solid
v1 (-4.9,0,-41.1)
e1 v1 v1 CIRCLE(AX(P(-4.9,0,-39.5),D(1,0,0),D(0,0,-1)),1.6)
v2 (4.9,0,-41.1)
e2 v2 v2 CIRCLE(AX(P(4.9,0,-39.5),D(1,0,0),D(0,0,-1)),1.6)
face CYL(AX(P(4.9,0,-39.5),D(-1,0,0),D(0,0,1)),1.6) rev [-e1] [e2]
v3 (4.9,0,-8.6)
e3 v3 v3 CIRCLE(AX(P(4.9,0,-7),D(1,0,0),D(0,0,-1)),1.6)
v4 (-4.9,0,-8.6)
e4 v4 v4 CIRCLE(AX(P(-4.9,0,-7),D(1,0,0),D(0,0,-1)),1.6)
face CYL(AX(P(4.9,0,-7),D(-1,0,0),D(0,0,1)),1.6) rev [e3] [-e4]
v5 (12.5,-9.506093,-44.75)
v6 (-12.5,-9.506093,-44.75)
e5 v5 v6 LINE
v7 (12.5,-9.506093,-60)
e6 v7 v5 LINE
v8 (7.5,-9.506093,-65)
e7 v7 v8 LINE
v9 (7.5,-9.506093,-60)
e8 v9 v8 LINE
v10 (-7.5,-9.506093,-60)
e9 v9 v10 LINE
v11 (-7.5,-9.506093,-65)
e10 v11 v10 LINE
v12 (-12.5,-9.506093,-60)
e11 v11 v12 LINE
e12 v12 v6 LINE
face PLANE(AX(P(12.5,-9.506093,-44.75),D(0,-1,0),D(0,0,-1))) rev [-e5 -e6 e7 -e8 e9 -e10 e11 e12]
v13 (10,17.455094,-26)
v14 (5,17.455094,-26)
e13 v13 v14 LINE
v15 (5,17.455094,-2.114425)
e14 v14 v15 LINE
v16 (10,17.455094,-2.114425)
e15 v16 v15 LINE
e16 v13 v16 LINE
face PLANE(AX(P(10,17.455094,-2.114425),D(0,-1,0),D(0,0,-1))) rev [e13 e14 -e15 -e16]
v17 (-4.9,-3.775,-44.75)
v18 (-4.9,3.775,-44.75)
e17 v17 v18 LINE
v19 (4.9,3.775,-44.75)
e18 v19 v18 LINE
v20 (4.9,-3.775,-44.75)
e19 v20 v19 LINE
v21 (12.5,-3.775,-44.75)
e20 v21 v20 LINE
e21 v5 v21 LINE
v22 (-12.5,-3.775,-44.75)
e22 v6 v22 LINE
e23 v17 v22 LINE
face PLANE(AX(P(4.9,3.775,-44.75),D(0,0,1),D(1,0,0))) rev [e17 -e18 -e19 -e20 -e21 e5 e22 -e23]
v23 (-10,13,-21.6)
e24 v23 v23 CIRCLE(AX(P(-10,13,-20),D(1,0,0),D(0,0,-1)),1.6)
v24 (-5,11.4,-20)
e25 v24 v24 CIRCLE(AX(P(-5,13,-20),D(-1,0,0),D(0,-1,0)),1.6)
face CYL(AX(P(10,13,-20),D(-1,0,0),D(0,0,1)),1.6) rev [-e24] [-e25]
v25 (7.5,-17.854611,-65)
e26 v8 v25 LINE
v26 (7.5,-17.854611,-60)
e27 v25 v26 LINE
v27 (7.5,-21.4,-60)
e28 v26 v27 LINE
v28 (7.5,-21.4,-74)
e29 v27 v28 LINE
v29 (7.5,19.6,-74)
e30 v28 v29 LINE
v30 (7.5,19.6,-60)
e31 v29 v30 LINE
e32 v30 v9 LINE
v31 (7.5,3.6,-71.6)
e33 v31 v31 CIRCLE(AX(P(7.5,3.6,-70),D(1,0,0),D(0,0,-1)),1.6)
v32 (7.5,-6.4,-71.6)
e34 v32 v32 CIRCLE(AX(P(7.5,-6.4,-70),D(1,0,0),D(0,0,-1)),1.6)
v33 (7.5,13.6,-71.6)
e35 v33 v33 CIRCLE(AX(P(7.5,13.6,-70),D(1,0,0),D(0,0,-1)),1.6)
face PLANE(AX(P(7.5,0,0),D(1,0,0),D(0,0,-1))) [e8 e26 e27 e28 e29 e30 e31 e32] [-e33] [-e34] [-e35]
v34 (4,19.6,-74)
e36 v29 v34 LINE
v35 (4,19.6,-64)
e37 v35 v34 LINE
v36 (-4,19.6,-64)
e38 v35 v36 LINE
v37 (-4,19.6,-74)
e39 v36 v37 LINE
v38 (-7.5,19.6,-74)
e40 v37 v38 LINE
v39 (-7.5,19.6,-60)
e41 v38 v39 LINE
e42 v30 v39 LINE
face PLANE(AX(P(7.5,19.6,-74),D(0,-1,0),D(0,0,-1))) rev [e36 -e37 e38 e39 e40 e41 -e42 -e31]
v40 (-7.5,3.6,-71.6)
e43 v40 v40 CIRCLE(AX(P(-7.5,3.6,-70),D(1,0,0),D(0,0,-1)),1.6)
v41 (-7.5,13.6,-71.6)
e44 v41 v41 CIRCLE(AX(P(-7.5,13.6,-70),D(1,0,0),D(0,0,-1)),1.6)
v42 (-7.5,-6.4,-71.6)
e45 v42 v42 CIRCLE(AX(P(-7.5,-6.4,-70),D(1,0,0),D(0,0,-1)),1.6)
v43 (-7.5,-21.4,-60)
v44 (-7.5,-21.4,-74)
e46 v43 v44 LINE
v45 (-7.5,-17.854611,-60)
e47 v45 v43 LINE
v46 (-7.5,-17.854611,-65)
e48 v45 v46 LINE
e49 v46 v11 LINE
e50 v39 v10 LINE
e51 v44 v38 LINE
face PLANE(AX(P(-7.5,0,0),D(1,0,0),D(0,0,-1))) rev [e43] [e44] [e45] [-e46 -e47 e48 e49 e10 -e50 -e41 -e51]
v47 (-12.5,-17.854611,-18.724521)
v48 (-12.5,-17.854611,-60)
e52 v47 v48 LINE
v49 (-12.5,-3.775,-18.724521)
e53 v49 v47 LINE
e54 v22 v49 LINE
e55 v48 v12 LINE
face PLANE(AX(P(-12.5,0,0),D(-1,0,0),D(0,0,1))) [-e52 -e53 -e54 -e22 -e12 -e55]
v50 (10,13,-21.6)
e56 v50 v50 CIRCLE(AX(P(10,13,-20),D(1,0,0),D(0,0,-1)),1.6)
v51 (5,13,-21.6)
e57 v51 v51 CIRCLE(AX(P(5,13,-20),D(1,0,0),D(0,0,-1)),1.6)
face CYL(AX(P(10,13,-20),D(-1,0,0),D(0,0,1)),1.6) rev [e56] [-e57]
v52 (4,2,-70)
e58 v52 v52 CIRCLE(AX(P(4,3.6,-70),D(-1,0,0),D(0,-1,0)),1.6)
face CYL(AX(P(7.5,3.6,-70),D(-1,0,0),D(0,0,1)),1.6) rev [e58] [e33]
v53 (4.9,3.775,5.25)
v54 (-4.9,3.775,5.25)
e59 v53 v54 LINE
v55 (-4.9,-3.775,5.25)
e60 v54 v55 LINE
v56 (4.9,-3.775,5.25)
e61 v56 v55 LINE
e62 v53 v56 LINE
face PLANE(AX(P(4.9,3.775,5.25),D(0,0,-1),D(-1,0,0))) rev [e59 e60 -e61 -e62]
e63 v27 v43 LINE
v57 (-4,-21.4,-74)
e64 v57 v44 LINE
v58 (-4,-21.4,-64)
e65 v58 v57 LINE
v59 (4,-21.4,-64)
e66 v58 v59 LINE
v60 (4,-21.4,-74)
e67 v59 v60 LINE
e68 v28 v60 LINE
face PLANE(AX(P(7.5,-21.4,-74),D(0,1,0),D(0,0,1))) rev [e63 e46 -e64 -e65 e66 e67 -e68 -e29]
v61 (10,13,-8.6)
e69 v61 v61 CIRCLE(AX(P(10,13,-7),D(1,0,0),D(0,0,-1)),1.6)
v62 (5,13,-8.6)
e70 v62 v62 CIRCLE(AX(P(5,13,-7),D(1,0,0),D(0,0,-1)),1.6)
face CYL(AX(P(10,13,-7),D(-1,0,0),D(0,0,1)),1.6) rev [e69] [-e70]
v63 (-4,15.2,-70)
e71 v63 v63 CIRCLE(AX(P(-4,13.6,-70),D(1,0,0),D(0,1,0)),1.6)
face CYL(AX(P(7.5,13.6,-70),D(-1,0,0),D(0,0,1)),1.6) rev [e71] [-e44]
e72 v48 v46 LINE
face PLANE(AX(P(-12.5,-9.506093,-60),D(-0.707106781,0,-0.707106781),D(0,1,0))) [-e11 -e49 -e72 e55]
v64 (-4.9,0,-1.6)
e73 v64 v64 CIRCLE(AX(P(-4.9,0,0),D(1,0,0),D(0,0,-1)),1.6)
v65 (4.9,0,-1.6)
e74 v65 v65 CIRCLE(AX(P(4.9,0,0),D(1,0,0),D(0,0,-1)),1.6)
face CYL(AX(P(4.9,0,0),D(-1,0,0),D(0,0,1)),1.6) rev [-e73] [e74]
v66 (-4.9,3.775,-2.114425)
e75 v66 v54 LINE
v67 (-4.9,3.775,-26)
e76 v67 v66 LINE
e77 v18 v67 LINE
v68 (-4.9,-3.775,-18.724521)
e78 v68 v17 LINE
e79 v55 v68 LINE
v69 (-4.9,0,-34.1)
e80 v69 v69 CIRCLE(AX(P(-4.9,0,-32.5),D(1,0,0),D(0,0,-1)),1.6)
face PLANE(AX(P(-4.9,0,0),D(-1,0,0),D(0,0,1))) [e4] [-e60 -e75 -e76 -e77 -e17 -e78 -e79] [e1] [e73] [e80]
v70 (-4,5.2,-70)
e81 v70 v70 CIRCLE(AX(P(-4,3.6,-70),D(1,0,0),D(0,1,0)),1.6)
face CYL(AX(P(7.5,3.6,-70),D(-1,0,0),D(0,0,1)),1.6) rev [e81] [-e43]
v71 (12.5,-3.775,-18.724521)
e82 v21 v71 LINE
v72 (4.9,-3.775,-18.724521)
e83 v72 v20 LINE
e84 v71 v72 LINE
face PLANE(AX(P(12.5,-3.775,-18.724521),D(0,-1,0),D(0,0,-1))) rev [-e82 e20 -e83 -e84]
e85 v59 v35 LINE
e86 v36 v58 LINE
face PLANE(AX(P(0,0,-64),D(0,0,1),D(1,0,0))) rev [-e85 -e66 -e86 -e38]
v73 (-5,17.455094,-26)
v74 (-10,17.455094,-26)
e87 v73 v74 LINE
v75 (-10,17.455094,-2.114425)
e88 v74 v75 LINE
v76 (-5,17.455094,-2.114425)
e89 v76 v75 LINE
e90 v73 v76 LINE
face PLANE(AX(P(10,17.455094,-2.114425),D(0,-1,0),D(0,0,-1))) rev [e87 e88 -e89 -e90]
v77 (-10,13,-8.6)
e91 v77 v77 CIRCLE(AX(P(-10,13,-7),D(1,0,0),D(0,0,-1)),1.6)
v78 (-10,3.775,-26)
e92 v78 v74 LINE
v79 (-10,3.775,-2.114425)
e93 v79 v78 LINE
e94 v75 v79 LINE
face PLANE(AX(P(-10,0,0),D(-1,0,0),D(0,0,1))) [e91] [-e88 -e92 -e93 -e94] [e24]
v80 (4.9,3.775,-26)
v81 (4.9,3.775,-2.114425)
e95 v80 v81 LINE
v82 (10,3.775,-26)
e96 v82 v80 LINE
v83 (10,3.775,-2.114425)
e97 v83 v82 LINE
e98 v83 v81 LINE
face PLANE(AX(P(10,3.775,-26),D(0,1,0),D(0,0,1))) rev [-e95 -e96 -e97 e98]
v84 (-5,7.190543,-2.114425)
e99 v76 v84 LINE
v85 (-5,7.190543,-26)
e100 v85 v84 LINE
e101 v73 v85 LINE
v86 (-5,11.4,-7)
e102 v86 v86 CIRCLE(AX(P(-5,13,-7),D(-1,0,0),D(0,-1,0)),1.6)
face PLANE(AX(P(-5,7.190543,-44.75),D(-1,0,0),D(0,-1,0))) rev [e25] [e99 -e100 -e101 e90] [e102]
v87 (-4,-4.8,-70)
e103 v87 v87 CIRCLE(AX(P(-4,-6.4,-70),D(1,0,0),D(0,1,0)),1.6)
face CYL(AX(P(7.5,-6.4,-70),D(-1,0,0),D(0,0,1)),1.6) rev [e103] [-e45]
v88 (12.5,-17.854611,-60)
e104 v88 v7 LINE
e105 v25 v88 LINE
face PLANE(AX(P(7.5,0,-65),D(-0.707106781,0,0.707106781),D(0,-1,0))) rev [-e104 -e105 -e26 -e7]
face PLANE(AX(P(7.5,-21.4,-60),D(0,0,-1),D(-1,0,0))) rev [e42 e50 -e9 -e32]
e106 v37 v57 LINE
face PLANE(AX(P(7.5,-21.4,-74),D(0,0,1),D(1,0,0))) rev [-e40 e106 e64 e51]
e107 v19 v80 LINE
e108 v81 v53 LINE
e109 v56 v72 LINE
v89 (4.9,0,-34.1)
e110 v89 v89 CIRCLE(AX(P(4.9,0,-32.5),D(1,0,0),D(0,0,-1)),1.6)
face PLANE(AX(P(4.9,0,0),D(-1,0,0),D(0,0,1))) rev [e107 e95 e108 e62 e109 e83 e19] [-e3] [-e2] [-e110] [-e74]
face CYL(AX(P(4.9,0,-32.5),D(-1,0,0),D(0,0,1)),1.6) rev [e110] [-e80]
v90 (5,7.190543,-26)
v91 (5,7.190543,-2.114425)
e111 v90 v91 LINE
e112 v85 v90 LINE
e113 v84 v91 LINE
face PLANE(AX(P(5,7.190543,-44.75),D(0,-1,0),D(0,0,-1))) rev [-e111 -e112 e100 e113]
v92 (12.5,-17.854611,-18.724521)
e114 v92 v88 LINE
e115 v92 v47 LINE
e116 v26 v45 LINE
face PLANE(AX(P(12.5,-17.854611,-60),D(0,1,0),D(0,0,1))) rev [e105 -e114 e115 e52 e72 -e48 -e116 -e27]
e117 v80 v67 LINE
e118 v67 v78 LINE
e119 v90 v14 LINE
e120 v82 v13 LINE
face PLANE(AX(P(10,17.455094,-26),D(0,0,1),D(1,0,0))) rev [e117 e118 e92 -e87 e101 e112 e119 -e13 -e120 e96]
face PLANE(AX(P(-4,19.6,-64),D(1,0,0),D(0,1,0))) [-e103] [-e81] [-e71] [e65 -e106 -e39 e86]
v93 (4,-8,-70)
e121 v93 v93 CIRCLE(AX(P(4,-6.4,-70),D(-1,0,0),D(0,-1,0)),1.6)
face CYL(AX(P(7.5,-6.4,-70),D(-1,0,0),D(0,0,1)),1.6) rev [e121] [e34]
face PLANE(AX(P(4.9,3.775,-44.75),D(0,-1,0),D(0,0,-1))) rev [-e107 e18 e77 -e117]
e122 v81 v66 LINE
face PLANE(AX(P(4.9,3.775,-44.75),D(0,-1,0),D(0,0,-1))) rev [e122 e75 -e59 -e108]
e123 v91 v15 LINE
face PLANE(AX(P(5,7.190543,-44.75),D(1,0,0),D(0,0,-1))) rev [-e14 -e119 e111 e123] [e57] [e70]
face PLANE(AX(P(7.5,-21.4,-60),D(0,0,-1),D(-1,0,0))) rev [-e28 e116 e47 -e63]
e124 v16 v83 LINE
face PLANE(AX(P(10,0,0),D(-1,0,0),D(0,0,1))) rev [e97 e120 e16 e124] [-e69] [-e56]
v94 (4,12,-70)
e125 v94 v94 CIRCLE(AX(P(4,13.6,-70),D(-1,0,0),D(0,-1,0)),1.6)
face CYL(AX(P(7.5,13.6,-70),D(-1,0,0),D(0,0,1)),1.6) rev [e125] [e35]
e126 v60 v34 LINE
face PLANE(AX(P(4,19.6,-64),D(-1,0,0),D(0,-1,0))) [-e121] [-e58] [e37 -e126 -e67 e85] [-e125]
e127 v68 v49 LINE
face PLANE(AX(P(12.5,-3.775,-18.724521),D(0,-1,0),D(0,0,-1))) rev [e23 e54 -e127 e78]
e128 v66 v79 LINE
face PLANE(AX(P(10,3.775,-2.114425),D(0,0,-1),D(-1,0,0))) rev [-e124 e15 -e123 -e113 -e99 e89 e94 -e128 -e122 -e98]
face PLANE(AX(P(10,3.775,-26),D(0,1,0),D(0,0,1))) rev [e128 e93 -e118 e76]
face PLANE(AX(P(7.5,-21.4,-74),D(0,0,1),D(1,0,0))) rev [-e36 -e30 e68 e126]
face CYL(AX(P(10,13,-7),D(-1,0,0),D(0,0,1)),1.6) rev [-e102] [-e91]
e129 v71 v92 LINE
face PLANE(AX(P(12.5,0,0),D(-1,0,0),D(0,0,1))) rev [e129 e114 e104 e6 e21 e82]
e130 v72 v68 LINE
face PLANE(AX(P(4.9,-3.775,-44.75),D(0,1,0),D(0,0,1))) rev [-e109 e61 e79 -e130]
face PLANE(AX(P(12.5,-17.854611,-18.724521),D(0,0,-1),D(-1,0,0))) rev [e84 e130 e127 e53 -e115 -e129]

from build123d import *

# Parameters (mm, degrees)
SKETCH_2_W          = 50
SKETCH_2_H          = 7.55
SKETCH_2_R          = 1.6
EXTRUDE_1_DEPTH     = 4.9
SKETCH_3_W          = 23.885574904
SKETCH_3_H          = 13.680093874
SKETCH_3_R          = 1.6
EXTRUDE_2_DEPTH     = 10
SKETCH_4_W          = 10
SKETCH_4_H          = 10.264550668
CUT_EXTRUDE_1_DEPTH = 48.143107127
SKETCH_6_W          = 14
SKETCH_6_H          = 41
SKETCH_6_R          = 1.6
EXTRUDE_4_DEPTH     = 7.5
SKETCH_7_W          = 8
SKETCH_7_H          = 41
CUT_EXTRUDE_2_DEPTH = 10
EXTRUDE_5_DEPTH     = 12.5
CHAMFER_1_SIZE      = 5


with BuildPart() as part:
    # 草图2 → 凸台-拉伸1 (new, symmetric)
    with BuildSketch(Plane(origin=(0, 0, 0), x_dir=(0, 0, -1), z_dir=(1, 0, 0))):
        with Locations((19.75, 0)):
            Rectangle(SKETCH_2_W, SKETCH_2_H)
        Circle(SKETCH_2_R, mode=Mode.SUBTRACT)
        with Locations((7, 0)):
            Circle(SKETCH_2_R, mode=Mode.SUBTRACT)
        with Locations((32.5, 0)):
            Circle(SKETCH_2_R, mode=Mode.SUBTRACT)
        with Locations((39.5, 0)):
            Circle(SKETCH_2_R, mode=Mode.SUBTRACT)
    extrude(amount=EXTRUDE_1_DEPTH, both=True)

    # 草图3 → 凸台-拉伸2 (add, symmetric)
    with BuildSketch(Plane(origin=(0, 0, 0), x_dir=(0, 0, -1), z_dir=(1, 0, 0))):
        with Locations((14.057212548, 10.615046937)):
            Rectangle(SKETCH_3_W, SKETCH_3_H)
        with Locations((7, 13)):
            Circle(SKETCH_3_R, mode=Mode.SUBTRACT)
        with Locations((20, 13)):
            Circle(SKETCH_3_R, mode=Mode.SUBTRACT)
    extrude(amount=EXTRUDE_2_DEPTH, both=True)

    # 草图4 → 切除-拉伸1 (cut, through all)
    with BuildSketch(Plane.XY.offset(-2.114425096)):
        with Locations((0, 12.32281854)):
            Rectangle(SKETCH_4_W, SKETCH_4_H)
    extrude(amount=-CUT_EXTRUDE_1_DEPTH, mode=Mode.SUBTRACT)



with BuildPart() as body_2:
    # 草图6 → 凸台-拉伸4 (new, symmetric)
    with BuildSketch(Plane(origin=(0, 0, 0), x_dir=(0, 0, -1), z_dir=(1, 0, 0))):
        with Locations((67, -0.9)):
            Rectangle(SKETCH_6_W, SKETCH_6_H)
        with Locations((70, 3.6)):
            Circle(SKETCH_6_R, mode=Mode.SUBTRACT)
        with Locations((70, 13.6)):
            Circle(SKETCH_6_R, mode=Mode.SUBTRACT)
        with Locations((70, -6.4)):
            Circle(SKETCH_6_R, mode=Mode.SUBTRACT)
    extrude(amount=EXTRUDE_4_DEPTH, both=True)

    # 草图7 → 切除-拉伸2 (cut)
    with BuildSketch(Plane.XY.offset(-74)):
        with Locations((0, -0.9)):
            Rectangle(SKETCH_7_W, SKETCH_7_H)
    extrude(amount=CUT_EXTRUDE_2_DEPTH, mode=Mode.SUBTRACT)


with BuildPart() as part_1:
    add(part.part)

    add(body_2.part)  # 凸台-拉伸5 merges body 2
    # 草图8 → 凸台-拉伸5 (add, symmetric)
    with BuildSketch(Plane(origin=(0, 0, 0), x_dir=(0, 0, -1), z_dir=(1, 0, 0))):
        Polygon((44.75, -3.775), (44.75, -9.506092627), (60, -9.506092627), (60, -17.854611286), (18.724521107, -17.854611286), (18.724521107, -3.775), align=None)
    extrude(amount=EXTRUDE_5_DEPTH, both=True)

    # 倒角1
    chamfer_1_edges = [part_1.edges().sort_by_distance(p)[0] for p in [
        (-7.5, -13.680351956, -60),
        (7.5, -13.680351956, -60),
    ]]
    chamfer(chamfer_1_edges, length=CHAMFER_1_SIZE - 0.0001)  # a hair under: the kernel refuses the full size


solid = part_1.part
